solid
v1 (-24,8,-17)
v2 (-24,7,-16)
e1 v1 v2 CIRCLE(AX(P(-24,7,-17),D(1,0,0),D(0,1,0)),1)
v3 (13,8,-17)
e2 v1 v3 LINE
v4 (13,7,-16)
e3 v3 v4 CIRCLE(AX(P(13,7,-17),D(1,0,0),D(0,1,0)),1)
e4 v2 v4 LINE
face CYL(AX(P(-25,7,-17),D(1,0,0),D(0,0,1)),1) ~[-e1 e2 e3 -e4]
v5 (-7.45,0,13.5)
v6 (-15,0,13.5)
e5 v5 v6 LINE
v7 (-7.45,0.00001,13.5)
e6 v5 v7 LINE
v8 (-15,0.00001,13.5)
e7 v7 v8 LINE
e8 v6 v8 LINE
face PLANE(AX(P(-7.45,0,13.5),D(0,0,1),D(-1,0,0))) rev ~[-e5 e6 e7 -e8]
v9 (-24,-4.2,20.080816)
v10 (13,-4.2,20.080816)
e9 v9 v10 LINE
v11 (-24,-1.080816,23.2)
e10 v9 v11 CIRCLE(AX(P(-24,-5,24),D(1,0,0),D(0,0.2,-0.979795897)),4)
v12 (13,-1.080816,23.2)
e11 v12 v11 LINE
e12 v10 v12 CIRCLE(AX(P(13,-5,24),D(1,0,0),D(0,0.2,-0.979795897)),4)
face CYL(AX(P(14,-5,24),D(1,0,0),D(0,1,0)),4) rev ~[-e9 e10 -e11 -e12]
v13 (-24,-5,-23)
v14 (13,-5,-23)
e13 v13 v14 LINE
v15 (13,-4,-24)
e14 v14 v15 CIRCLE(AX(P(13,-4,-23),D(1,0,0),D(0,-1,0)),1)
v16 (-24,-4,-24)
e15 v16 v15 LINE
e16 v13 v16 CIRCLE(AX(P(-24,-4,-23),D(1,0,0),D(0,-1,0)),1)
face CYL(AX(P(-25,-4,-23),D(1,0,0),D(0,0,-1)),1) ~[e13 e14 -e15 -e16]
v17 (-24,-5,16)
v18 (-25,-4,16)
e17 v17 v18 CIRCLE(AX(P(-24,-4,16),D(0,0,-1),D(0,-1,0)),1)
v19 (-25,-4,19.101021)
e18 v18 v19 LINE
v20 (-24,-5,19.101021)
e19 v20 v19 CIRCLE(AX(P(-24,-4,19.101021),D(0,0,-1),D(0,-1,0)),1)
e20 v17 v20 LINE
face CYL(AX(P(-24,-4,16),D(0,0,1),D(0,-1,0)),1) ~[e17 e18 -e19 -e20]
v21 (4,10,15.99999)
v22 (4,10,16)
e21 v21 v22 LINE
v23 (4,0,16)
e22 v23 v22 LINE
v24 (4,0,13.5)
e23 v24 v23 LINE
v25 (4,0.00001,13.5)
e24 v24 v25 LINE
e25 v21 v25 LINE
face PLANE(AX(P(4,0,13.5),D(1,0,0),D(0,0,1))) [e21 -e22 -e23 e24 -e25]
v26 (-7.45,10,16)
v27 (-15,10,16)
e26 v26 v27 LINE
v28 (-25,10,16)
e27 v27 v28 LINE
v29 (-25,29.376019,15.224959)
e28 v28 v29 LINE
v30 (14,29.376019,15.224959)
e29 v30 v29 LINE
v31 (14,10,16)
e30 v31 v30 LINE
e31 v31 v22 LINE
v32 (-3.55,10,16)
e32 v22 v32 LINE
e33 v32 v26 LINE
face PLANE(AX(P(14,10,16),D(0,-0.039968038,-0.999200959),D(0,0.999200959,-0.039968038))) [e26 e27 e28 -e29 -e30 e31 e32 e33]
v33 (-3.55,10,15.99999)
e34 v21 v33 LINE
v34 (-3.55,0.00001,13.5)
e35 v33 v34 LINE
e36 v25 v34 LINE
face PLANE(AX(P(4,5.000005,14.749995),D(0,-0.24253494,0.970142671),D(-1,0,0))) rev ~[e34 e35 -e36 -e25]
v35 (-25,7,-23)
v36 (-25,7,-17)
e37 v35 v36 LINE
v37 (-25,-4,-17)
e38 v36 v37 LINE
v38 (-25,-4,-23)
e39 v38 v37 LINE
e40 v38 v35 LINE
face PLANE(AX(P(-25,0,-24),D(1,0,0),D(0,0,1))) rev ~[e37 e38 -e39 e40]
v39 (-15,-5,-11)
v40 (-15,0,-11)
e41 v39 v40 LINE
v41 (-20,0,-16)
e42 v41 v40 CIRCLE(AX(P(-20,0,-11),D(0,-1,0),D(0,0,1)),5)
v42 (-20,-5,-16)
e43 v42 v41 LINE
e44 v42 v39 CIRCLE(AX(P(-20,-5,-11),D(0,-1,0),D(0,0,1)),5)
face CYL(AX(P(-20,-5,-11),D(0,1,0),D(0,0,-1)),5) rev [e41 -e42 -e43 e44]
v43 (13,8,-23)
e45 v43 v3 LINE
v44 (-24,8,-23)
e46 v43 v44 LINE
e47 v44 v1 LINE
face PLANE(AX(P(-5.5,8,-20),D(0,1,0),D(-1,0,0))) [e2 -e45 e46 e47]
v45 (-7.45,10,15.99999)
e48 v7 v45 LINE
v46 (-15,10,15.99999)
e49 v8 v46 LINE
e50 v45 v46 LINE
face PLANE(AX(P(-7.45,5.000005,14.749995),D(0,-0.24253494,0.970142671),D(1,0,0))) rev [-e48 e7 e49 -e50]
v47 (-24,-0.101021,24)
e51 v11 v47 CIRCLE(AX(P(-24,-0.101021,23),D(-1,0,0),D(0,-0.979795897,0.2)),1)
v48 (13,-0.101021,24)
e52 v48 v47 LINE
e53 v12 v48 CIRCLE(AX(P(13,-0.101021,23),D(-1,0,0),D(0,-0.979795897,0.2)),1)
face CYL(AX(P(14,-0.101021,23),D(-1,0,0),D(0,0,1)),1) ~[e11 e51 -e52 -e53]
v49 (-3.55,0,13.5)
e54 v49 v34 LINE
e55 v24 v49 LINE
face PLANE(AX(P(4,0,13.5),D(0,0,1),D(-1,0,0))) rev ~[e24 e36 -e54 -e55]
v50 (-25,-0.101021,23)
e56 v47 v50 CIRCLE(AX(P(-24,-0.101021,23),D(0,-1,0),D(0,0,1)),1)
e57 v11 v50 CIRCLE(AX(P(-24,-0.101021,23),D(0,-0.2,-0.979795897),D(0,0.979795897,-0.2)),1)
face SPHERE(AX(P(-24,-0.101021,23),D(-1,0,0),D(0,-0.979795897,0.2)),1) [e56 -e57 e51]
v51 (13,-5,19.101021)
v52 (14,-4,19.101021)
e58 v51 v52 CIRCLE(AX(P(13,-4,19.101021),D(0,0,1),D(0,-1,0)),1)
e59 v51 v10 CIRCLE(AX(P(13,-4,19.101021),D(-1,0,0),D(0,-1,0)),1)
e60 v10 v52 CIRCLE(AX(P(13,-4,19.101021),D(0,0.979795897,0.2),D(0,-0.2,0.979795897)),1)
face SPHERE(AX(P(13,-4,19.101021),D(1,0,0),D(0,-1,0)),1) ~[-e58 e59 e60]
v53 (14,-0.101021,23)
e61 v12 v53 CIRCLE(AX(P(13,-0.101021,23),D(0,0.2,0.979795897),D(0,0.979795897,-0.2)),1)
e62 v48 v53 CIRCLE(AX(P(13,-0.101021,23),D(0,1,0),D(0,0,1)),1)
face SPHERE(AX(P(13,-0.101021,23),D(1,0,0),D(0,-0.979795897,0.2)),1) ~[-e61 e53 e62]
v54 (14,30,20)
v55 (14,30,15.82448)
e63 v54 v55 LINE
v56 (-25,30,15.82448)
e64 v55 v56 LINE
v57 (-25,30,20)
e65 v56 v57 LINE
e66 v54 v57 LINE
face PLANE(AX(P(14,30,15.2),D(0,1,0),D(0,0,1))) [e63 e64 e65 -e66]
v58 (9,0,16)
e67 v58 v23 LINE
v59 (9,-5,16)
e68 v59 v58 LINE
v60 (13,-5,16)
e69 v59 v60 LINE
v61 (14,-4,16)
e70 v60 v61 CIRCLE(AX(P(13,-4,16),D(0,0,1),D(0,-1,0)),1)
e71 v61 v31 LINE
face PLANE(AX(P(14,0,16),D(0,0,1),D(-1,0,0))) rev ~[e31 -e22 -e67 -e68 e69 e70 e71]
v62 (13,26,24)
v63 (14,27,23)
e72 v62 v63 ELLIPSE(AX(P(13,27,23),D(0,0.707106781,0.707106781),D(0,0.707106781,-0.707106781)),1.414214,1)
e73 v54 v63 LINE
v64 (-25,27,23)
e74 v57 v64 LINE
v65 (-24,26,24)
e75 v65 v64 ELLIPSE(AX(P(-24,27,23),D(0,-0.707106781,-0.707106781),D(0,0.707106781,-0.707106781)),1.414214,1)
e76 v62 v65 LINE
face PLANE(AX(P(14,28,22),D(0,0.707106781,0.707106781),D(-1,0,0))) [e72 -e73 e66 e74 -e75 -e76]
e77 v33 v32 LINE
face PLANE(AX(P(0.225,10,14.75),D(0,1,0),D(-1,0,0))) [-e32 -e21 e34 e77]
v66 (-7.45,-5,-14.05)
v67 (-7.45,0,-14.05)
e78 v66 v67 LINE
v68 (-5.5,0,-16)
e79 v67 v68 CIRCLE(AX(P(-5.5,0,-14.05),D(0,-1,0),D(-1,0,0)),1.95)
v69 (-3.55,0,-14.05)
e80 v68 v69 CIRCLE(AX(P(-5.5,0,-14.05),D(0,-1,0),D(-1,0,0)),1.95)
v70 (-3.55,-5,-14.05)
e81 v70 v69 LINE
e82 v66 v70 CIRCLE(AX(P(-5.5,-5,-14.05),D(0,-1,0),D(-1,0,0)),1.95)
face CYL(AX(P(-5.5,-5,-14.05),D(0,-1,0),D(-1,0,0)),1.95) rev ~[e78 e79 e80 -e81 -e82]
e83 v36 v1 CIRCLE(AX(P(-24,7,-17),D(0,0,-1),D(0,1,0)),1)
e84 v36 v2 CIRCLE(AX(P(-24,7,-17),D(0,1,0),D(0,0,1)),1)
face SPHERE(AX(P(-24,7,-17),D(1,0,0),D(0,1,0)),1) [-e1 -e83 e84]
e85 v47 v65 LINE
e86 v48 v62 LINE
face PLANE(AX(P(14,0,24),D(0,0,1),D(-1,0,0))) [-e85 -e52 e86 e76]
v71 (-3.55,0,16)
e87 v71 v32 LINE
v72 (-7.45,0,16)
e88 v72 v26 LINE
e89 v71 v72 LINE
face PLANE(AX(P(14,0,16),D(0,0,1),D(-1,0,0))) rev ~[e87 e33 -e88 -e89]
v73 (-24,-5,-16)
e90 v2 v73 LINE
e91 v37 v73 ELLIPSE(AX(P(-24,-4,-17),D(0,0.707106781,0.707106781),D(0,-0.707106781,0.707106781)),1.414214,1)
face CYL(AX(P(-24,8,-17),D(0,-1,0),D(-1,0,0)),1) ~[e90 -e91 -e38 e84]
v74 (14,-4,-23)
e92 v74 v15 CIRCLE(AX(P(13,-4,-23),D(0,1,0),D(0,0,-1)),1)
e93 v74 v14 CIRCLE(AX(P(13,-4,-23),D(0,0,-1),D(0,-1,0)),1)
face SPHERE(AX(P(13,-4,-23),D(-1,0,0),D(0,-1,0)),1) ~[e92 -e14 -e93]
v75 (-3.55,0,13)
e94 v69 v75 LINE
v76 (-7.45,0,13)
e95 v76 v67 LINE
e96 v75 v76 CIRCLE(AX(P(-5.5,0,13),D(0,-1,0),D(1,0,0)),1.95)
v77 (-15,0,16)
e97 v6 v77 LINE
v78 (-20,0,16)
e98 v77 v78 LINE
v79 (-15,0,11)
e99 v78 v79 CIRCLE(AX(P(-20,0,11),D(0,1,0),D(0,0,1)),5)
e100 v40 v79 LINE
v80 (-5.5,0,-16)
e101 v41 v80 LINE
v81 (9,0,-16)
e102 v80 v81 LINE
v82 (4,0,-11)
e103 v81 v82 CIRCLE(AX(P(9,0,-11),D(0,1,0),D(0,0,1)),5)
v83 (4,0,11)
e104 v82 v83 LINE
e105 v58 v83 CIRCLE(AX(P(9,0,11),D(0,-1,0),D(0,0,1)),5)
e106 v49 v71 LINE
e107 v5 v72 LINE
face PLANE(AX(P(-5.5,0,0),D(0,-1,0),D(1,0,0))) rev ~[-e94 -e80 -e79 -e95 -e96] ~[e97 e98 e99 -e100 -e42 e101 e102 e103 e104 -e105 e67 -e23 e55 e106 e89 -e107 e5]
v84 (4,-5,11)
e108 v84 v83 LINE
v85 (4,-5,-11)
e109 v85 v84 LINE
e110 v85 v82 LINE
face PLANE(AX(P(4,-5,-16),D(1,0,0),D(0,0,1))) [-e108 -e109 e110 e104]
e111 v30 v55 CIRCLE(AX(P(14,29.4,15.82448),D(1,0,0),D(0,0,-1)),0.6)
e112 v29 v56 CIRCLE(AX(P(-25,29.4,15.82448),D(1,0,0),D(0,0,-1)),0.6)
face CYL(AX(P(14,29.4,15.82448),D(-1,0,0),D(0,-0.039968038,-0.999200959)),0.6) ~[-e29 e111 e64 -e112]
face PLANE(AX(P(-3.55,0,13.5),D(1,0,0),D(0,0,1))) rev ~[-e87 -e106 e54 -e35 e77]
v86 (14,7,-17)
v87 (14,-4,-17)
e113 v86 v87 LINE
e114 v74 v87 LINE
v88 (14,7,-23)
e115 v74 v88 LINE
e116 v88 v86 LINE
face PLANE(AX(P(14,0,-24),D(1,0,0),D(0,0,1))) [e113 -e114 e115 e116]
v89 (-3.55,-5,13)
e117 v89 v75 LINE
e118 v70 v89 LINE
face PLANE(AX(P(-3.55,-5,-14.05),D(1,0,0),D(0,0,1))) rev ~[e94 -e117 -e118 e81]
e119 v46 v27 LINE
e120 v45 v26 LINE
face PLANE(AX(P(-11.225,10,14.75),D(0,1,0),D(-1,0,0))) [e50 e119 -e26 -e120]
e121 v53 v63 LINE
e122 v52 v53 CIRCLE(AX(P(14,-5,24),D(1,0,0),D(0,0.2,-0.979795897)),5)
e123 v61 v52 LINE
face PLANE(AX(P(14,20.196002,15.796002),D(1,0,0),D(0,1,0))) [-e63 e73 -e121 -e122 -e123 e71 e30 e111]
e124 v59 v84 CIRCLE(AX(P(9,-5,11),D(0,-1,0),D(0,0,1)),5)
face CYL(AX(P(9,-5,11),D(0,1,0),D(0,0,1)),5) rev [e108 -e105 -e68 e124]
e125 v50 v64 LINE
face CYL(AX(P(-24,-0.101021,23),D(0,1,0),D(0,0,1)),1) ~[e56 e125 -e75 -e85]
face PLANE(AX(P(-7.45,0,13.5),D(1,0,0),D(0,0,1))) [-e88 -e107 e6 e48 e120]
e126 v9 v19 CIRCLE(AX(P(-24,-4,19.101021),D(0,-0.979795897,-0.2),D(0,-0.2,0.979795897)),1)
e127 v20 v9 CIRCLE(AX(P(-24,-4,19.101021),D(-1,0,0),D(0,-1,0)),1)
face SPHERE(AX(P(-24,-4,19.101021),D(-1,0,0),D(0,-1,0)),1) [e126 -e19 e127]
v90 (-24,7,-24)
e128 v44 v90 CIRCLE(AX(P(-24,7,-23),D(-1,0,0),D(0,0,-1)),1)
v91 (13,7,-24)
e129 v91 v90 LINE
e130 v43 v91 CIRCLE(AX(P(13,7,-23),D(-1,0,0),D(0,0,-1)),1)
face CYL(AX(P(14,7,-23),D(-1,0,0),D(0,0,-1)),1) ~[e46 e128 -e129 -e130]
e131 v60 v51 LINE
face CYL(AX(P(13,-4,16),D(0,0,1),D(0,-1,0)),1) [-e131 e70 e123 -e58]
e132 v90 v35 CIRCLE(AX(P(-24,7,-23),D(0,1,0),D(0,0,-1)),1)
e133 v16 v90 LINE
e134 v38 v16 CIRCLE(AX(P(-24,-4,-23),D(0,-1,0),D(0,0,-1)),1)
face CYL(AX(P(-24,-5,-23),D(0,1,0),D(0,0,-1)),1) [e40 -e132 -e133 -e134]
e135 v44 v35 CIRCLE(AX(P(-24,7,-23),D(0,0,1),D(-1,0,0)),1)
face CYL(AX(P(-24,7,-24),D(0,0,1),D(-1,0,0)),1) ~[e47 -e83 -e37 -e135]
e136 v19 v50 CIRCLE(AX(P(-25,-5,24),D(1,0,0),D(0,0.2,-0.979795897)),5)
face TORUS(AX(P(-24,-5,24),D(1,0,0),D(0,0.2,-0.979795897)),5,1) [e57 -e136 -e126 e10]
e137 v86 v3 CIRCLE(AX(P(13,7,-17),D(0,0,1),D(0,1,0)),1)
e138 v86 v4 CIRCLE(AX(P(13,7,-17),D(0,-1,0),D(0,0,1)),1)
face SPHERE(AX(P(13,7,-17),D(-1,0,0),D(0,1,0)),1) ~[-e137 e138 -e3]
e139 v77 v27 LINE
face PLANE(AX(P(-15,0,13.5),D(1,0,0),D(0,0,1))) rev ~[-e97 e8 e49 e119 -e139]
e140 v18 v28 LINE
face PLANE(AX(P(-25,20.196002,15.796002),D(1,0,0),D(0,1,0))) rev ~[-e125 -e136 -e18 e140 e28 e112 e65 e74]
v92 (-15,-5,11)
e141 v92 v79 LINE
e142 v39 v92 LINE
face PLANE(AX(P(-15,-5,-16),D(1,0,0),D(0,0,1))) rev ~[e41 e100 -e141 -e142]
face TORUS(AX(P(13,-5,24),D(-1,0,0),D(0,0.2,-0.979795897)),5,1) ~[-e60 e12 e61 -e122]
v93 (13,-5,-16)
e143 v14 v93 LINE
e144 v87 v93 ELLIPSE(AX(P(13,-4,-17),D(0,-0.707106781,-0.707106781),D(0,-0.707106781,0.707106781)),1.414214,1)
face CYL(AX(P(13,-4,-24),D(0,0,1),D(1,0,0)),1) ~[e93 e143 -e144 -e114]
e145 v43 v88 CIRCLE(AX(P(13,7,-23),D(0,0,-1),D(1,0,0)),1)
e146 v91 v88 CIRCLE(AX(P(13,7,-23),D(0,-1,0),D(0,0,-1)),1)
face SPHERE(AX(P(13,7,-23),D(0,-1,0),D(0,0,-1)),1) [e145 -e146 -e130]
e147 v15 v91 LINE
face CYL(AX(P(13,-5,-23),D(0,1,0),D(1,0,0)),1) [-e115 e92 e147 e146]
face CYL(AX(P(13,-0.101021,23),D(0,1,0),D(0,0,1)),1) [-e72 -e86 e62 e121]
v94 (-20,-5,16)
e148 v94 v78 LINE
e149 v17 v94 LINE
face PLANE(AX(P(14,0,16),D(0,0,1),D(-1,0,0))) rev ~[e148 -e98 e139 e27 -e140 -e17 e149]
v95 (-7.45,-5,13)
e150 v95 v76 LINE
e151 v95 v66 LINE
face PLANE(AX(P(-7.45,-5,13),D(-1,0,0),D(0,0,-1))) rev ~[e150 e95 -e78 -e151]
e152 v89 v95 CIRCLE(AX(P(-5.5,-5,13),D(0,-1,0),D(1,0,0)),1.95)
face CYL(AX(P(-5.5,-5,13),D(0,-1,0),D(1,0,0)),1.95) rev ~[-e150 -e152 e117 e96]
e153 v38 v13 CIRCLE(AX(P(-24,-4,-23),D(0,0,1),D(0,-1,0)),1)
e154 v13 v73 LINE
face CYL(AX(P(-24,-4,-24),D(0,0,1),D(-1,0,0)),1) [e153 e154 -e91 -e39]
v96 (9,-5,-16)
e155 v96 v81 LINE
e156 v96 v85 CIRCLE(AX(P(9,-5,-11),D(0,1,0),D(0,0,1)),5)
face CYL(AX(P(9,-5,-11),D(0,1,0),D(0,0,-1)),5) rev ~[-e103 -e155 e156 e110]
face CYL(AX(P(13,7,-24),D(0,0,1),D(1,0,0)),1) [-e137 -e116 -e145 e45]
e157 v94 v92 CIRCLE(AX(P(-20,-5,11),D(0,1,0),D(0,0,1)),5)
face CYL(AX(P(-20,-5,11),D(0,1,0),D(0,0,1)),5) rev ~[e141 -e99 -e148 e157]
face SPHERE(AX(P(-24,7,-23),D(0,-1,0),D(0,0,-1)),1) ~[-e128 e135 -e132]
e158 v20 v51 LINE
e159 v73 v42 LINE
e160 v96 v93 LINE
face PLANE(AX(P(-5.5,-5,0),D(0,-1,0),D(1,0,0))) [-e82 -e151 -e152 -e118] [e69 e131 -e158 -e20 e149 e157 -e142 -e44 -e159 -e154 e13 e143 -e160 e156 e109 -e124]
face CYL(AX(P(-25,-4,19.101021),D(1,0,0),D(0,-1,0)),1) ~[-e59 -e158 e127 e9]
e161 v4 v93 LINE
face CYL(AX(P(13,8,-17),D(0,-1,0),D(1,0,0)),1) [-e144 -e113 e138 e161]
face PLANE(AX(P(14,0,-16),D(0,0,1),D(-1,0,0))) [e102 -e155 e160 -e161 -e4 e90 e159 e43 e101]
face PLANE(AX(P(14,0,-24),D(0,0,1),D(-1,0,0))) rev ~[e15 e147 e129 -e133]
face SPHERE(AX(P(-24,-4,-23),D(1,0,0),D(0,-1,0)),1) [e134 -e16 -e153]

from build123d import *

# Parameters (mm, degrees)
F0_W      = 39
F0_H      = 48
F1_DEPTH  = 5
F2_W      = 10
F2_H      = 32
F3_DEPTH  = 5.001
F4_W      = 39
F4_H      = 8
F5_DEPTH  = 30
F7_DEPTH  = 39
F8_R      = 4
F9_DEPTH  = 39.001
F10_R     = 1
F11_SIZE  = 4
F12_W     = 39
F12_H     = 8
F13_DEPTH = 8
F15_DEPTH = 35.001
F16_R     = 1
F17_R     = 5
F18_R     = 0.6
F19_W     = 7.55
F19_H     = 2.5
F20_DEPTH = 10
F21_SIZE2 = 9.99999
F21_SIZE  = 2.49999
F22_SIZE2 = 2.49999
F22_SIZE  = 9.99999


# Not quite as in the source:
# - a fillet or chamfer is up to 0.001 mm smaller than in the source, because OpenCascade refuses the exact size


with BuildPart() as f1:
    # F0 (on Front) → F1 (new body)
    with BuildSketch(Plane.XZ):
        with Locations((-5.5, 0)):
            Rectangle(F0_W, F0_H)
    extrude(amount=F1_DEPTH)

    # F2 (on face) → F3 (cut, through all)
    with BuildSketch(Plane.XZ.offset(5)):
        with Locations((-20, 0)):
            Rectangle(F2_W, F2_H)
        with Locations((9, 0)):
            Rectangle(F2_W, F2_H)
    extrude(amount=-F3_DEPTH, mode=Mode.SUBTRACT)

    # F4 (on face) → F5 (join)
    with BuildSketch(Plane(origin=(0, 0, 0), x_dir=(-1, 0, 0), z_dir=(0, 1, 0))):
        with Locations((5.5, 20)):
            Rectangle(F4_W, F4_H)
    extrude(amount=F5_DEPTH)

    # F6 (on face) → F7 (join, through all)
    with BuildSketch(Plane.YZ.offset(14)):
        Polygon((30, 16), (10, 16), (30, 15.2), align=None)
    extrude(amount=-F7_DEPTH)

    # F8 (on face) → F9 (cut, through all)
    with BuildSketch(Plane.YZ.offset(14)):
        with Locations((-5, 24)):
            Circle(F8_R)
    extrude(amount=-F9_DEPTH, mode=Mode.SUBTRACT)

    # F10
    f10_edges = [f1.edges().sort_by_distance(p)[0] for p in [
        (-5.5, -1, 24),
        (-5.5, -5, 20),
    ]]
    fillet(f10_edges, radius=F10_R)

    # F11
    f11_edges = [f1.edges().sort_by_distance(p)[0] for p in [
        (-5.5, 30, 24),
    ]]
    chamfer(f11_edges, length=F11_SIZE)

    # F12 (on face) → F13 (join)
    with BuildSketch(Plane(origin=(0, 0, 0), x_dir=(-1, 0, 0), z_dir=(0, 1, 0))):
        with Locations((5.5, -20)):
            Rectangle(F12_W, F12_H)
    extrude(amount=F13_DEPTH)

    # F14 (on face) → F15 (cut, through all)
    with BuildSketch(Plane.XZ.offset(5)):
        with BuildLine():
            Line((-3.55, -14.05), (-3.55, 13))
            ThreePointArc((-3.55, 13), (-5.5, 14.95), (-7.45, 13))
            Line((-7.45, 13), (-7.45, -14.05))
            ThreePointArc((-7.45, -14.05), (-5.5, -16), (-3.55, -14.05))
        make_face()
    extrude(amount=-F15_DEPTH, mode=Mode.SUBTRACT)

    # F16
    f16_edges = [f1.edges().sort_by_distance(p)[0] for p in [
        (-5.5, -4.2, 20.080816),
        (-5.5, -5, -24),
        (-25, -5, -20),
        (14, -5, -20),
        (14, -5, 17.55051),
        (-25, -5, 17.55051),
        (-25, 12.94949, 24),
        (14, 12.94949, 24),
        (14, 1.5, -24),
        (-25, 1.5, -24),
        (-5.5, 8, -16),
        (-5.5, 8, -24),
        (14, 8, -20),
        (-25, 8, -20),
        (-25, 1.5, -16),
        (14, 1.5, -16),
    ]]
    fillet(f16_edges, radius=F16_R)

    # F17
    f17_edges = [f1.edges().sort_by_distance(p)[0] for p in [
        (-15, -2.5, 16),
        (-15, -2.5, -16),
        (4, -2.5, 16),
        (4, -2.5, -16),
    ]]
    fillet(f17_edges, radius=F17_R)

    # F18
    f18_edges = [f1.edges().sort_by_distance(p)[0] for p in [
        (-5.5, 30, 15.2),
    ]]
    fillet(f18_edges, radius=F18_R)

    # F19 (on face) → F20 (join)
    with BuildSketch(Plane(origin=(0, 0, 0), x_dir=(-1, 0, 0), z_dir=(0, 1, 0))):
        with Locations((-0.225, 14.75)):
            Rectangle(F19_W, F19_H)
        with Locations((11.225, 14.75)):
            Rectangle(F19_W, F19_H)
    extrude(amount=F20_DEPTH)

    # F21 (size 2.5 and 10 in the source; OpenCascade refuses exactly that, so slightly less here)
    f21_edges = [f1.edges().sort_by_distance(p)[0] for p in [
        (0.225, 10, 13.5),
    ]]
    f21_side = f1.faces().sort_by_distance((0.225, 10, 14.75))[0]
    chamfer(f21_edges, length=F21_SIZE, length2=F21_SIZE2, reference=f21_side)

    # F22 (size 10 and 2.5 in the source; OpenCascade refuses exactly that, so slightly less here)
    f22_edges = [f1.edges().sort_by_distance(p)[0] for p in [
        (-11.225, 10, 13.5),
    ]]
    f22_side = f1.faces().sort_by_distance((-11.225, 5, 13.5))[0]
    chamfer(f22_edges, length=F22_SIZE, length2=F22_SIZE2, reference=f22_side)


solid = f1.part
